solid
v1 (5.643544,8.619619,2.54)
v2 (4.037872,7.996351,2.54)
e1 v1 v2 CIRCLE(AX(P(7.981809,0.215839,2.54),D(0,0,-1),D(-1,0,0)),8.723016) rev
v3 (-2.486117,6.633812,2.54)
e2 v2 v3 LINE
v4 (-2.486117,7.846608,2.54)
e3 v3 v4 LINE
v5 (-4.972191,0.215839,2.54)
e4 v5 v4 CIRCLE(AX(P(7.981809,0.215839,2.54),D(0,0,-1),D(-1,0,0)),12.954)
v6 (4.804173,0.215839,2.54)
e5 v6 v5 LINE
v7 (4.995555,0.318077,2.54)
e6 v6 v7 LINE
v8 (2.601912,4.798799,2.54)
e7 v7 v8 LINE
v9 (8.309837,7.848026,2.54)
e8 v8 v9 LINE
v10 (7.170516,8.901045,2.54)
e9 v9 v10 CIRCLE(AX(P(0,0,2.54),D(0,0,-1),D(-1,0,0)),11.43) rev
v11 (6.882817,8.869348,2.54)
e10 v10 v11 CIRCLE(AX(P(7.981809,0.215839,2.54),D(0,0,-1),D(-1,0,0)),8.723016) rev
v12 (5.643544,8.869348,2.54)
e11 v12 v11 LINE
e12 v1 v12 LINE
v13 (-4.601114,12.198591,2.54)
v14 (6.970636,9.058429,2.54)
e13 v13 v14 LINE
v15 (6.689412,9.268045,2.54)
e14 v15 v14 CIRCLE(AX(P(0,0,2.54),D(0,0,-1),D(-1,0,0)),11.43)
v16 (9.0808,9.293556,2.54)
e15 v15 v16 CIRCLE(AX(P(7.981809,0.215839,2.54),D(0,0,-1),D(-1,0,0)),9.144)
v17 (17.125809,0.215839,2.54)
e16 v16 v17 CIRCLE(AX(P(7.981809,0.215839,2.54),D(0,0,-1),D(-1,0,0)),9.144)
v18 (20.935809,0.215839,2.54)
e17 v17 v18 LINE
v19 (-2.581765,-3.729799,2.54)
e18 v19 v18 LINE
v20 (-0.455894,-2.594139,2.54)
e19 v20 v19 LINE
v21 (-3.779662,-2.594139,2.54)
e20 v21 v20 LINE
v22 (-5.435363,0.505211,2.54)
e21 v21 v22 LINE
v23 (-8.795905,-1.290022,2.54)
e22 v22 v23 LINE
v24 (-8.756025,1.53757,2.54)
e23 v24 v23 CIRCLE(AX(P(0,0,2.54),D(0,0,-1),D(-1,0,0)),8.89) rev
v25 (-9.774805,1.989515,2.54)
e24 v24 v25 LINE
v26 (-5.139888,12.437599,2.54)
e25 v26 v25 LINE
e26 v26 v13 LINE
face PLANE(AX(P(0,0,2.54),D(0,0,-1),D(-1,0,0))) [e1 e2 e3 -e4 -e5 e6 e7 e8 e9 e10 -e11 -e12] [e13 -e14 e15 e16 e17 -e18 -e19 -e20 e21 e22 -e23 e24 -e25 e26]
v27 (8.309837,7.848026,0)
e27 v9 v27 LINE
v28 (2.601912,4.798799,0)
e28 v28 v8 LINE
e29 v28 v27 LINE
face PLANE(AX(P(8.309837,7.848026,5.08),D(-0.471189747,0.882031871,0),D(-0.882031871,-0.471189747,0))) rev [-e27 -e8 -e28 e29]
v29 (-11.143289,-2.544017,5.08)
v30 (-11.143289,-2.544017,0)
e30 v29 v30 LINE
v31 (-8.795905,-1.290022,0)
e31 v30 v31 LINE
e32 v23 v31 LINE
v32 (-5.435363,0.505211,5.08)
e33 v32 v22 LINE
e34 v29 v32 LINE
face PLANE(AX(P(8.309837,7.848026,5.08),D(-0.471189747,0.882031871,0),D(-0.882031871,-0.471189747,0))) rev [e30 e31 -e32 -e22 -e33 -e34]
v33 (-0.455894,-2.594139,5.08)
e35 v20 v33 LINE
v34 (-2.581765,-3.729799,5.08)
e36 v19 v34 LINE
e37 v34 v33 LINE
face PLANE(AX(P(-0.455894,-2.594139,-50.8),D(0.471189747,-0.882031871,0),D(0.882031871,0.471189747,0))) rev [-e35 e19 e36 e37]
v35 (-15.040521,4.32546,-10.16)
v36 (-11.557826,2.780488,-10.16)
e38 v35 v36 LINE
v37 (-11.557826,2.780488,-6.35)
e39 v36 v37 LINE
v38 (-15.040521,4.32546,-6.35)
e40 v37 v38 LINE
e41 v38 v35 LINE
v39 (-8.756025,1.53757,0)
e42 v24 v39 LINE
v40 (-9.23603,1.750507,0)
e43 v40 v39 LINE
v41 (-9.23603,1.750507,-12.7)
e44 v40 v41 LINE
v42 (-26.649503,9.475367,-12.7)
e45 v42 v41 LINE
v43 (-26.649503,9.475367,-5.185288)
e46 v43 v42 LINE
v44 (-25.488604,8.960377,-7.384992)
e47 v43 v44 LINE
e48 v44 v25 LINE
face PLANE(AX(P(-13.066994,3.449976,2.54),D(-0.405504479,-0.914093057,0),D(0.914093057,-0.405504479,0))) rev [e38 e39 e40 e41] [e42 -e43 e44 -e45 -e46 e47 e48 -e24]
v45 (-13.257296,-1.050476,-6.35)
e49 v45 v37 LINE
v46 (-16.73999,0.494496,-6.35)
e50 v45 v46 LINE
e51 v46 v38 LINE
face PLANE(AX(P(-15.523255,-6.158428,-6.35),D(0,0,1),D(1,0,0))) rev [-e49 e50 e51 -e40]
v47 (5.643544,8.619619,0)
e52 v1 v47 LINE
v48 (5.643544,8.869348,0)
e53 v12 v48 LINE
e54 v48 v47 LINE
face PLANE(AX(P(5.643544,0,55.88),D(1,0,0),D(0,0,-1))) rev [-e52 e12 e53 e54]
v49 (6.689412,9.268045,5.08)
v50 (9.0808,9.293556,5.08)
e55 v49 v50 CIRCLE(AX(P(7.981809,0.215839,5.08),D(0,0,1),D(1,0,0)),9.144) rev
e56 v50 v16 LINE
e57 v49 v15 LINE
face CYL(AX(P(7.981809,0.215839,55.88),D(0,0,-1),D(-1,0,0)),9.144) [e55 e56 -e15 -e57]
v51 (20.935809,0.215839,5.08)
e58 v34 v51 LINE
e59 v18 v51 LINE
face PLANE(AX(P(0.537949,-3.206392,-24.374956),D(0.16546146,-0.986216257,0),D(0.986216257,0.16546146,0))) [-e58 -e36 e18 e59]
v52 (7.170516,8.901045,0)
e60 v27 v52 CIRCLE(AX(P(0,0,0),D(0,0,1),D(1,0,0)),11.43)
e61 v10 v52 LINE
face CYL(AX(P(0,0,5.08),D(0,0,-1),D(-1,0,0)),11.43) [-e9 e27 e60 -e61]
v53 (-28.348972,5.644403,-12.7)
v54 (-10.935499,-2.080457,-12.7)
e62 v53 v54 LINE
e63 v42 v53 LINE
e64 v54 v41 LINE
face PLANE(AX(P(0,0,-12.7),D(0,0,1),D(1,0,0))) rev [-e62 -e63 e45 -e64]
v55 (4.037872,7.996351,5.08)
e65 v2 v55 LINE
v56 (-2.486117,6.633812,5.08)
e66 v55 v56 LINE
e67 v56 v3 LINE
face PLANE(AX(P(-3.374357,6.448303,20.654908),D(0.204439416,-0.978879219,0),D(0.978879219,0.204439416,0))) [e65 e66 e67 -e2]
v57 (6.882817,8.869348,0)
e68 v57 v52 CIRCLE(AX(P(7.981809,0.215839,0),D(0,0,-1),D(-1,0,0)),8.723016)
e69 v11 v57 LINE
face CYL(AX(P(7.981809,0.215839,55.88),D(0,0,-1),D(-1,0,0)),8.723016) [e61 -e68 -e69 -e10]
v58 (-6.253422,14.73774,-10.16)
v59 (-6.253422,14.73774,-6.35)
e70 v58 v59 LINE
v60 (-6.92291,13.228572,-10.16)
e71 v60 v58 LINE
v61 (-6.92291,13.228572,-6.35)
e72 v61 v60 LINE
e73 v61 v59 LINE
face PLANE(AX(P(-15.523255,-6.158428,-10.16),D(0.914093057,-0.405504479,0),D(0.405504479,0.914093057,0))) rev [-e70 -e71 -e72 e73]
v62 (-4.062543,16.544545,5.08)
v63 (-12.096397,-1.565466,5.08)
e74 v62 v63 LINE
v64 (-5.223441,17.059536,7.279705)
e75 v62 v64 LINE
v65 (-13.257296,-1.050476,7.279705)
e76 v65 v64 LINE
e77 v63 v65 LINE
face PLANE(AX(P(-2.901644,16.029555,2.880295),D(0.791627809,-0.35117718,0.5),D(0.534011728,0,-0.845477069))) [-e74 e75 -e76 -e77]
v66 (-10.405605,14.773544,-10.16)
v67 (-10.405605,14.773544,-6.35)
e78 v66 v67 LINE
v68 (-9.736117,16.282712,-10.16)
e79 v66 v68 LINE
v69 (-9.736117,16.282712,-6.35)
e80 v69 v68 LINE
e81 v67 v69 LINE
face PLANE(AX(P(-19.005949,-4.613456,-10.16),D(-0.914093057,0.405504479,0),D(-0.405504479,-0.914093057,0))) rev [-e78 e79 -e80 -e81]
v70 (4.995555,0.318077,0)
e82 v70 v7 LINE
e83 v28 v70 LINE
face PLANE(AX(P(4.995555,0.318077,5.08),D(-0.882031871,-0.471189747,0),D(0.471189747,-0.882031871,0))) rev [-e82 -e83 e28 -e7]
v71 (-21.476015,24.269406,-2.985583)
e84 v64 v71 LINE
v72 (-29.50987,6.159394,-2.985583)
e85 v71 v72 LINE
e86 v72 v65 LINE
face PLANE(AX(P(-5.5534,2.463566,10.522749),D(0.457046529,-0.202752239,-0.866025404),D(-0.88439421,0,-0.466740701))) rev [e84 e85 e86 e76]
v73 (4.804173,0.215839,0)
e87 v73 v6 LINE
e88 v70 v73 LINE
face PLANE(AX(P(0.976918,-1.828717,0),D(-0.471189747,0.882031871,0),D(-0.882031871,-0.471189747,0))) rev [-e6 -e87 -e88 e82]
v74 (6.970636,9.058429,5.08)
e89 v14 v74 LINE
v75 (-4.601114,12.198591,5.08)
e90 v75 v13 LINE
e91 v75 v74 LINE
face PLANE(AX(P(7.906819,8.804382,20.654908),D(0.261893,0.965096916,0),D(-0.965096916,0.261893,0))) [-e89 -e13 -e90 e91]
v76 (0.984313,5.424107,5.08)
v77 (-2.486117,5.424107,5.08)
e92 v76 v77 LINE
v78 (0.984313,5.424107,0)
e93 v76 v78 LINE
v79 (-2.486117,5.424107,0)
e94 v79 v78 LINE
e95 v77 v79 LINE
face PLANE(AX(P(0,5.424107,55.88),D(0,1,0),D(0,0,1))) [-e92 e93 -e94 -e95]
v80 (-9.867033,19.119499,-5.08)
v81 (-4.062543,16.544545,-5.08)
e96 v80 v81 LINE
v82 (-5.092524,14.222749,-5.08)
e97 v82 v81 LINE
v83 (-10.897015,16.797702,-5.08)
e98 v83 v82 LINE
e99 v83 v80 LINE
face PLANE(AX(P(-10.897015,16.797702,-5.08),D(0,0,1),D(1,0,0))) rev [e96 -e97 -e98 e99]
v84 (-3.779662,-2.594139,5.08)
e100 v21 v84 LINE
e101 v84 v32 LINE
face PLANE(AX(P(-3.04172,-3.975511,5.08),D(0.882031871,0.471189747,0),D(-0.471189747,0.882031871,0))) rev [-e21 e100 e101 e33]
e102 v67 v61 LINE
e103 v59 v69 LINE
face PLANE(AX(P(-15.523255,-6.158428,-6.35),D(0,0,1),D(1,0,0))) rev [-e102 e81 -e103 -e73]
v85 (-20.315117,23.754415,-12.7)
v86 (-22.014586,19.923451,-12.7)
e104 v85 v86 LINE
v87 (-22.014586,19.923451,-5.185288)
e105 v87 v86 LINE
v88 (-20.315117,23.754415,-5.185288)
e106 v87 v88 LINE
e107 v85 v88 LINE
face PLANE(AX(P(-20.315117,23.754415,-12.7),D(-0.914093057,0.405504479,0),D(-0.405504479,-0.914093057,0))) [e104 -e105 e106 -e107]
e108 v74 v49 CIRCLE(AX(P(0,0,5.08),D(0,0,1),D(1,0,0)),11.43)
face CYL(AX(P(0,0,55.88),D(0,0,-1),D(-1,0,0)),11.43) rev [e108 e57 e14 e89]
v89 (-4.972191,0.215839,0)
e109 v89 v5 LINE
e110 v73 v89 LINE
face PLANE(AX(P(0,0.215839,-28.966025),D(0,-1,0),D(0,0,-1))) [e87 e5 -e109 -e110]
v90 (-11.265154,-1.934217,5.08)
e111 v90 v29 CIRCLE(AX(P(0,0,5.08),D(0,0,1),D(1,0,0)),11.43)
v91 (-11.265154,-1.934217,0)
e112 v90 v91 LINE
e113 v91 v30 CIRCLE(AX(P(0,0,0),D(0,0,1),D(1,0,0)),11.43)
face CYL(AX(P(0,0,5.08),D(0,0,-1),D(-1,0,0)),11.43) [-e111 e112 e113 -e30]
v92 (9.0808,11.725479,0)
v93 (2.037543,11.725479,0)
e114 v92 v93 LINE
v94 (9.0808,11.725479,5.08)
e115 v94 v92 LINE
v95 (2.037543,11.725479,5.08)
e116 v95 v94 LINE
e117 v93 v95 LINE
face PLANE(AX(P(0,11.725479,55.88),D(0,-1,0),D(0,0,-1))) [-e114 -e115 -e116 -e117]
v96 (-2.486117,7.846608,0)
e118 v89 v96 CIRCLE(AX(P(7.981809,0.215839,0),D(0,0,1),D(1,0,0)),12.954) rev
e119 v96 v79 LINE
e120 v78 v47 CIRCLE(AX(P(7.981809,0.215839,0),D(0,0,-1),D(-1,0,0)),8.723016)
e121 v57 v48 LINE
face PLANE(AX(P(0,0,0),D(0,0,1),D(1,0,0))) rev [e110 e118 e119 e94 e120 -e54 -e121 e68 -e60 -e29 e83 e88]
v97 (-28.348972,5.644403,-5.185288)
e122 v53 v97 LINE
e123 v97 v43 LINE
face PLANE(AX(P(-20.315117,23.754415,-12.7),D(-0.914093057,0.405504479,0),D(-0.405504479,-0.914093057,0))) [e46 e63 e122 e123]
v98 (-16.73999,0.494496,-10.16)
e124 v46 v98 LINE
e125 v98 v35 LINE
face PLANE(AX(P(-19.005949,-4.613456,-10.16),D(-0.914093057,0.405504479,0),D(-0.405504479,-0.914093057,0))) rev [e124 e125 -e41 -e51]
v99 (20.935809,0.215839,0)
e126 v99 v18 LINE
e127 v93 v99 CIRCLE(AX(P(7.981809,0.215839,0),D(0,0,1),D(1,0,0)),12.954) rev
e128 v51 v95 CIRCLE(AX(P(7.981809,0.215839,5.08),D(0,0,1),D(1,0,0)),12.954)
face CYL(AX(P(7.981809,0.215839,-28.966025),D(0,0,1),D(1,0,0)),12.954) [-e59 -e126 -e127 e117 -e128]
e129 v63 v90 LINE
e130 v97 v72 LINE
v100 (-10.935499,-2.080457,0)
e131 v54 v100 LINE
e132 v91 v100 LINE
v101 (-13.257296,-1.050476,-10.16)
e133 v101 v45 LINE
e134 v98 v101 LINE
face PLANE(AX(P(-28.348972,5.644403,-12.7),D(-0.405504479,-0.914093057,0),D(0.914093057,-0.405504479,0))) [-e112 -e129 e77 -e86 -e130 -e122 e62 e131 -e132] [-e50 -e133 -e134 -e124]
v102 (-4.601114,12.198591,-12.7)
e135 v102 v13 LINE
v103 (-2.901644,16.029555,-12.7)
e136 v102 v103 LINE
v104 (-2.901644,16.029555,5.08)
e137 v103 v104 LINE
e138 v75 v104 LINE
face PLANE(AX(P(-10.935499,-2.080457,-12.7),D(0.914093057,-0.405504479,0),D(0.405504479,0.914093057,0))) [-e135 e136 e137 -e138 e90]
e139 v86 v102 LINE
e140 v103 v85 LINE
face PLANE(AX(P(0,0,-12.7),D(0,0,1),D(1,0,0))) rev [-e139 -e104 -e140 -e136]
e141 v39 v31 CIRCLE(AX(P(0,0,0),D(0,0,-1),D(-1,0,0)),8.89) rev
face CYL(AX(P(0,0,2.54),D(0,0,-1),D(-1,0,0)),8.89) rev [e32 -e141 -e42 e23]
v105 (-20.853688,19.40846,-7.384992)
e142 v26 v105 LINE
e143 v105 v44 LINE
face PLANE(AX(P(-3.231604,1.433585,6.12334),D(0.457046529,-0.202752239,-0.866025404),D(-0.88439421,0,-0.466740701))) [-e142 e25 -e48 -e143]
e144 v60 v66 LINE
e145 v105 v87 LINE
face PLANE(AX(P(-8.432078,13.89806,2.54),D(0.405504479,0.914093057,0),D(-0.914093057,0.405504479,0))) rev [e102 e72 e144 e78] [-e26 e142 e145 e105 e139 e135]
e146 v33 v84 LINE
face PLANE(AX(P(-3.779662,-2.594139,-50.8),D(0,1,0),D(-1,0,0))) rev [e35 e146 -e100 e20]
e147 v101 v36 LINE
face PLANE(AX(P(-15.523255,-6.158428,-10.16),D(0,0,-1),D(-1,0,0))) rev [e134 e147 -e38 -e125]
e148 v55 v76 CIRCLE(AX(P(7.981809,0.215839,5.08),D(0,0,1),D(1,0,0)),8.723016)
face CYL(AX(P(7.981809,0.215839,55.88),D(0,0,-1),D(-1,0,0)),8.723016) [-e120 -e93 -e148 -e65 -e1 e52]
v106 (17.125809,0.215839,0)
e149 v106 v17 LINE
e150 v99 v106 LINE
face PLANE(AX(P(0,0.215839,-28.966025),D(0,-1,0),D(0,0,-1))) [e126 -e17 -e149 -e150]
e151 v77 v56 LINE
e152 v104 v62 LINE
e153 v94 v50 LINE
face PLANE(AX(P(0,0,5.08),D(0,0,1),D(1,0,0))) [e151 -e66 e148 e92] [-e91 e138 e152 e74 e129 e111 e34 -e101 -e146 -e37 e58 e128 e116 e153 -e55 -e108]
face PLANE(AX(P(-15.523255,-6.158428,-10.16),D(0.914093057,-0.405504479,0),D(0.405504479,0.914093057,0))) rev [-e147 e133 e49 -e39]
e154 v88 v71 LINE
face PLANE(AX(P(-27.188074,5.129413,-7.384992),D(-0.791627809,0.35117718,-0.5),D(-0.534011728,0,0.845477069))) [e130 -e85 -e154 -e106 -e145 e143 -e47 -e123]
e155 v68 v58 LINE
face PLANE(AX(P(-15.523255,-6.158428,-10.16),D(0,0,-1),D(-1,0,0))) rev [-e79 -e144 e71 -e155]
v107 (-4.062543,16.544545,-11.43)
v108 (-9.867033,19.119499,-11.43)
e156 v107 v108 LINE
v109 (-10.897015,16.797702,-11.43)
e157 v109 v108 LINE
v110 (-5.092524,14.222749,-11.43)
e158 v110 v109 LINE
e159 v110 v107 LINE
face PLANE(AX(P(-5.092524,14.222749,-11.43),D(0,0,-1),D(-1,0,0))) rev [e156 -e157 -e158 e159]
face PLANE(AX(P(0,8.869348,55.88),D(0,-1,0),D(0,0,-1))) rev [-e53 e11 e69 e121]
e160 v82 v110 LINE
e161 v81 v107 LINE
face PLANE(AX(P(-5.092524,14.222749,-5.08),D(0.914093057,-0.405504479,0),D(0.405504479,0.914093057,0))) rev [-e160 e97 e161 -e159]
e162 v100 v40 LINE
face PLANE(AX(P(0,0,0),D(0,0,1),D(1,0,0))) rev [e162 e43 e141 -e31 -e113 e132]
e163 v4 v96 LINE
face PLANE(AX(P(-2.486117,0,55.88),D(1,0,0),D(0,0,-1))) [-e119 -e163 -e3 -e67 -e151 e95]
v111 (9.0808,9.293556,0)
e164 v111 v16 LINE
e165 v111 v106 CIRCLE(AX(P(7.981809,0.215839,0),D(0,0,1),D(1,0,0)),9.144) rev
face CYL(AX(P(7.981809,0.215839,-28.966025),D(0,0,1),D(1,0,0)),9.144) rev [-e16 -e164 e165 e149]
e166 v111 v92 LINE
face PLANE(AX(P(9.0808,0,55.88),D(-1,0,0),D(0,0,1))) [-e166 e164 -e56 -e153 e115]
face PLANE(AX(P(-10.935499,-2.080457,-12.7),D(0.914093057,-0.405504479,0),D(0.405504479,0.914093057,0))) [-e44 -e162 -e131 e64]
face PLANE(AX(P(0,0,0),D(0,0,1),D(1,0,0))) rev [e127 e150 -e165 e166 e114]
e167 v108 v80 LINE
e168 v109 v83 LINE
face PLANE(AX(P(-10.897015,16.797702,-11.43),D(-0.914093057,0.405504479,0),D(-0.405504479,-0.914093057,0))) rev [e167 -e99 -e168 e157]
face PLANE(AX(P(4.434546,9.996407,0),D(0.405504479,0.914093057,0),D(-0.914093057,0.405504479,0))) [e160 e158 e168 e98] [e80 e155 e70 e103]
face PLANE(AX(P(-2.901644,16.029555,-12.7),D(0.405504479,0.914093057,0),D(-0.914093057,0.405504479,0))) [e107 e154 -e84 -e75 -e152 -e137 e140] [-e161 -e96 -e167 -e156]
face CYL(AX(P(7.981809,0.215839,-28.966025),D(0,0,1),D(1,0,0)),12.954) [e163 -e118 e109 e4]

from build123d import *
from build123d.topology import SkipClean

# Parameters (mm, degrees)
BOSS_EXTRUDE1_DEPTH      = 5.08
CUT_EXTRUDE1_DEPTH       = 2.54
SKETCH3_W                = 9.11222741
SKETCH3_H                = 2.54
BOSS_EXTRUDE2_DEPTH      = 5.08
BOSS_EXTRUDE3_DEPTH      = 17.78
CUT_EXTRUDE2_DEPTH       = 15.24
CUT_EXTRUDE3_DEPTH       = 11.43
CHAMFER1_SIZE            = 10.265287786
CHAMFER1_SIZE_2          = 17.78
SKETCH7_W                = 3.81
SKETCH7_H                = 3.81
CUT_EXTRUDE4_DEPTH       = 25.4
SKETCH8_W                = 6.35
SKETCH8_H                = 6.35
CUT_EXTRUDE5_DEPTH       = 2.54
BOSS_EXTRUDE4_DEPTH      = 2.54
BOSS_EXTRUDE4_DEPTH_BACK = 2.54
BOSS_EXTRUDE5_START      = -5.08
BOSS_EXTRUDE5_DEPTH      = 5.08
BOSS_EXTRUDE6_START      = -2.54
BOSS_EXTRUDE6_DEPTH      = 2.54
CUT_EXTRUDE6_DEPTH       = 55.88
CUT_EXTRUDE7_START       = -5.08
CUT_EXTRUDE7_DEPTH       = 5.08
BOSS_EXTRUDE7_DEPTH      = 2.54


# Read off the part's stored shape, not the designer's step: Boss-Extrude5, Cut-Extrude7
with BuildPart() as part:
    # Sketch1 → Boss-Extrude1 (new body)
    with BuildSketch(Plane.XY):
        with BuildLine():
            Line((8.309836615, 7.848026213), (-11.143288506, -2.544016758))
            ThreePointArc((-11.143288506, -2.544016758), (-5.385698811, 10.08162429), (8.309836615, 7.848026213))
        make_face()
    extrude(amount=BOSS_EXTRUDE1_DEPTH)

    # Sketch2 → Cut-Extrude1 (cut)
    with SkipClean():  # the faces are left unmerged after this step: merging them gives an invalid solid
        with BuildSketch(Plane(origin=(0, 0, 0), x_dir=(-1, 0, 0), z_dir=(0, 0, -1))):
            with BuildLine():
                ThreePointArc((-3.514271346, 8.165904537), (4.188876853, 7.841263336), (8.741367154, 1.618826824))
                Line((8.741367154, 1.618826824), (-3.514271346, 8.165904537))
            make_face()
            with BuildLine():
                Line((8.741367154, 1.618826824), (-3.514271346, 8.165904537))
                ThreePointArc((-3.514271346, 8.165904537), (-4.803100251, 7.480797282), (-5.962452981, 6.594031729))
                Line((-5.962452981, 6.594031729), (8.795904873, -1.290022275))
                ThreePointArc((8.795904873, -1.290022275), (8.8884379, 0.166648428), (8.741367154, 1.618826824))
            make_face()
        extrude(amount=-CUT_EXTRUDE1_DEPTH, mode=Mode.SUBTRACT)

    # Sketch3 → Boss-Extrude2 (add)
    with SkipClean():  # the faces are left unmerged after this step: merging them gives an invalid solid
        with BuildSketch(Plane(origin=(-1.416725946, 2.652004727, 0), x_dir=(0.8820318713627303, 0.4711897472360366, 0), z_dir=(0.47118974723603657, -0.8820318713627302, 0))):
            with Locations((0, 3.81)):
                Rectangle(SKETCH3_W, SKETCH3_H)
        extrude(amount=BOSS_EXTRUDE2_DEPTH)

    # Sketch4 → Boss-Extrude3 (add)
    with SkipClean():  # the faces are left unmerged after this step: merging them gives an invalid solid
        with BuildSketch(Plane.XY.offset(5.08)):
            Polygon((-2.901644401, 16.029554576), (-20.315117145, 23.754414899), (-28.34897188, 5.644403245), (-10.935499136, -2.080457077), align=None)
        extrude(amount=-BOSS_EXTRUDE3_DEPTH)

    # Sketch5 → Cut-Extrude2 (cut)
    with BuildSketch(Plane(origin=(0, 0, -12.7), x_dir=(-1, 0, 0), z_dir=(0, 0, -1))):
        Polygon((8.432077676, 13.898059844), (0.608597096, 10.427454319), (5.243513289, -0.020629328), (13.066993869, 3.449976197), (22.818538605, 7.775897978), (18.183622412, 18.223981624), align=None)
    extrude(amount=-CUT_EXTRUDE2_DEPTH, mode=Mode.SUBTRACT)

    # Sketch6 → Cut-Extrude3 (cut)
    with BuildSketch(Plane(origin=(-0.869857896, -1.960844097, 0), x_dir=(0.914093057420647, -0.4055044788598195, 0), z_dir=(0.4055044788598195, 0.914093057420647, 0))):
        Polygon((-24.011429177, -2.54), (-38.355843434, 12.7), (-24.011429177, 12.7), align=None)
    extrude(amount=CUT_EXTRUDE3_DEPTH, mode=Mode.SUBTRACT)

    # Chamfer1
    # the kernel refuses this chamfer: 17.78, 10.265287786 mm, written as the material it takes off along each edge
    with BuildSketch(Plane(origin=(-1.662566122, 65.801219022, 5.08), x_dir=(-0.052920377689547264, 0.02347622050277695, -0.9983227437537927), z_dir=(-0.40550447885981916, -0.9140930574206472, 0))) as chamfer1_piece_1:
        Polygon((CHAMFER1_SIZE * 0.998322743772, CHAMFER1_SIZE * 0.0578938624038), (-CHAMFER1_SIZE_2 * 0.0578938624027, CHAMFER1_SIZE_2 * 0.998322743754), (0, 0), align=None)
    extrude(amount=111.808769435, mode=Mode.SUBTRACT)

    # Sketch7 → Cut-Extrude4 (cut)
    with BuildSketch(Plane(origin=(5.464527568, 12.318203553, 0), x_dir=(0.9140930574206471, -0.40550447885981944, 0), z_dir=(0.4055044788598195, 0.9140930574206472, 0))):
        with Locations((-13.597429177, 8.255)):
            Rectangle(SKETCH7_W, SKETCH7_H)
    extrude(amount=-CUT_EXTRUDE4_DEPTH, mode=Mode.SUBTRACT)

    # Sketch8 → Cut-Extrude5 (cut)
    with BuildSketch(Plane(origin=(5.464527568, 12.318203553, 0), x_dir=(0.9140930574206471, -0.40550447885981944, 0), z_dir=(0.4055044788598195, 0.9140930574206472, 0))):
        with Locations((-13.597429177, 8.255)):
            Rectangle(SKETCH8_W, SKETCH8_H)
    extrude(amount=-CUT_EXTRUDE5_DEPTH, mode=Mode.SUBTRACT)

    # Sketch10 → Boss-Extrude4 (add, two sides: drawn at the far end of the back side and taken through both)
    with BuildSketch(Plane(origin=(-4.392502173, 1.948575465, 8.323044218), x_dir=(0.8894427865769886, 0.10418568638497319, 0.4450133393041759), z_dir=(-0.457046528710329, 0.20275223942991202, 0.8660254037844353)).offset(-BOSS_EXTRUDE4_DEPTH_BACK)):
        Polygon((-26.934244752, 6.677804801), (-17.901786615, 24.311013357), (0.370973372, 14.950950547), (-8.661484766, -2.682258009), align=None)
    extrude(amount=BOSS_EXTRUDE4_DEPTH + BOSS_EXTRUDE4_DEPTH_BACK)

    # Boss-Extrude5 outline → Boss-Extrude5 (add)
    with BuildSketch(Plane.XY.offset(5.08).offset(BOSS_EXTRUDE5_START)):
        with BuildLine():
            Line((2.601911551, 4.798798792), (5.962452981, 6.594031729))
            ThreePointArc((5.962452981, 6.594031729), (2.56067771, 8.513226748), (-1.33537929, 8.789133186))
            Line((-1.33537929, 8.789133186), (-0.995970787, 9.554231902))
            ThreePointArc((-0.995970787, 9.554231902), (-3.936753752, 5.290676536), (-4.972191023, 0.215838758))
            Line((-4.972191023, 0.215838758), (4.804173359, 0.215838758))
            Line((4.804173359, 0.215838758), (4.995555467, 0.318076886))
            Line((4.995555467, 0.318076886), (2.601911551, 4.798798792))
        make_face()
        with BuildLine():
            ThreePointArc((1.359063718, 11.348913861), (4.156560335, 10.647436602), (6.689412036, 9.268045458))
            ThreePointArc((6.689412036, 9.268045458), (13.973263657, 7.123458233), (17.125808977, 0.215838758))
            Line((17.125808977, 0.215838758), (20.935808977, 0.215838758))
            ThreePointArc((20.935808977, 0.215838758), (14.385521725, 11.476326272), (1.359063718, 11.348913861))
        make_face()
    extrude(amount=BOSS_EXTRUDE5_DEPTH)

    # Sketch12 → Boss-Extrude6 (add)
    with BuildSketch(Plane.XY.offset(5.08).offset(BOSS_EXTRUDE6_START)):
        with BuildLine():
            ThreePointArc((17.125808977, 0.215838758), (13.973263657, 7.123458233), (6.689412036, 9.268045458))
            ThreePointArc((6.689412036, 9.268045458), (7.533158613, 8.59630277), (8.309836615, 7.848026213))
            Line((8.309836615, 7.848026213), (2.601911551, 4.798798792))
            Line((2.601911551, 4.798798792), (4.995555467, 0.318076886))
            Line((4.995555467, 0.318076886), (-2.581764519, -3.72979894))
            Line((-2.581764519, -3.72979894), (20.935808977, 0.215838758))
            Line((20.935808977, 0.215838758), (17.125808977, 0.215838758))
        make_face()
    extrude(amount=BOSS_EXTRUDE6_DEPTH)

    # Sketch13 → Cut-Extrude6 (cut)
    with BuildSketch(Plane.XY.offset(5.08)):
        Polygon((-0.455894293, -2.594139008), (-3.041719527, -3.975511244), (-3.779661608, -2.594139008), align=None)
    extrude(amount=-CUT_EXTRUDE6_DEPTH, mode=Mode.SUBTRACT)

    # Cut-Extrude7 outline → Cut-Extrude7 (cut)
    with BuildSketch(Plane(origin=(0, 0, 0), x_dir=(-1, 0, 0), z_dir=(0, 0, -1)).offset(CUT_EXTRUDE7_START)):
        with BuildLine():
            ThreePointArc((-7.17051589, 8.901044988), (-7.026535215, 8.886389823), (-6.882817494, 8.869347956))
            Line((-6.882817494, 8.869347956), (-5.6435439, 8.869347956))
            Line((-5.6435439, 8.869347956), (-5.6435439, 8.619618869))
            ThreePointArc((-5.6435439, 8.619618869), (-3.048054454, 7.409521405), (-0.984312942, 5.424106508))
            Line((-0.984312942, 5.424106508), (2.486117219, 5.424106508))
            Line((2.486117219, 5.424106508), (2.486117219, 8.869347956))
            Line((2.486117219, 8.869347956), (1.657843224, 8.869347956))
            ThreePointArc((1.657843224, 8.869347956), (1.333203623, 9.217874986), (0.995970787, 9.554231902))
            Line((0.995970787, 9.554231902), (0.608597096, 10.427454319))
            Line((0.608597096, 10.427454319), (2.328316525, 11.190345935))
            ThreePointArc((2.328316525, 11.190345935), (0.491068934, 11.41944619), (-1.359063718, 11.34891386))
            ThreePointArc((-1.359063718, 11.34891386), (-1.695483089, 11.542277864), (-2.037543, 11.725478978))
            Line((-2.037543, 11.725478978), (-9.08080046, 11.725478978))
            Line((-9.08080046, 11.725478978), (-9.08080046, 9.293556187))
            ThreePointArc((-9.08080046, 9.293556187), (-7.884268641, 9.359318505), (-6.689412036, 9.268045458))
            ThreePointArc((-6.689412036, 9.268045458), (-6.932393011, 9.087729482), (-7.17051589, 8.901044988))
        make_face()
    extrude(amount=CUT_EXTRUDE7_DEPTH, mode=Mode.SUBTRACT)

    # Sketch15 → Boss-Extrude7 (add)
    with BuildSketch(Plane(origin=(0, 0, 2.54), x_dir=(-1, 0, 0), z_dir=(0, 0, -1))):
        Polygon((-7.906818903, 8.804382246), (4.601113672, 12.198590573), (6.567709174, 7.765467415), (3.37435699, 6.448302999), align=None)
    extrude(amount=-BOSS_EXTRUDE7_DEPTH)


solid = part.part
